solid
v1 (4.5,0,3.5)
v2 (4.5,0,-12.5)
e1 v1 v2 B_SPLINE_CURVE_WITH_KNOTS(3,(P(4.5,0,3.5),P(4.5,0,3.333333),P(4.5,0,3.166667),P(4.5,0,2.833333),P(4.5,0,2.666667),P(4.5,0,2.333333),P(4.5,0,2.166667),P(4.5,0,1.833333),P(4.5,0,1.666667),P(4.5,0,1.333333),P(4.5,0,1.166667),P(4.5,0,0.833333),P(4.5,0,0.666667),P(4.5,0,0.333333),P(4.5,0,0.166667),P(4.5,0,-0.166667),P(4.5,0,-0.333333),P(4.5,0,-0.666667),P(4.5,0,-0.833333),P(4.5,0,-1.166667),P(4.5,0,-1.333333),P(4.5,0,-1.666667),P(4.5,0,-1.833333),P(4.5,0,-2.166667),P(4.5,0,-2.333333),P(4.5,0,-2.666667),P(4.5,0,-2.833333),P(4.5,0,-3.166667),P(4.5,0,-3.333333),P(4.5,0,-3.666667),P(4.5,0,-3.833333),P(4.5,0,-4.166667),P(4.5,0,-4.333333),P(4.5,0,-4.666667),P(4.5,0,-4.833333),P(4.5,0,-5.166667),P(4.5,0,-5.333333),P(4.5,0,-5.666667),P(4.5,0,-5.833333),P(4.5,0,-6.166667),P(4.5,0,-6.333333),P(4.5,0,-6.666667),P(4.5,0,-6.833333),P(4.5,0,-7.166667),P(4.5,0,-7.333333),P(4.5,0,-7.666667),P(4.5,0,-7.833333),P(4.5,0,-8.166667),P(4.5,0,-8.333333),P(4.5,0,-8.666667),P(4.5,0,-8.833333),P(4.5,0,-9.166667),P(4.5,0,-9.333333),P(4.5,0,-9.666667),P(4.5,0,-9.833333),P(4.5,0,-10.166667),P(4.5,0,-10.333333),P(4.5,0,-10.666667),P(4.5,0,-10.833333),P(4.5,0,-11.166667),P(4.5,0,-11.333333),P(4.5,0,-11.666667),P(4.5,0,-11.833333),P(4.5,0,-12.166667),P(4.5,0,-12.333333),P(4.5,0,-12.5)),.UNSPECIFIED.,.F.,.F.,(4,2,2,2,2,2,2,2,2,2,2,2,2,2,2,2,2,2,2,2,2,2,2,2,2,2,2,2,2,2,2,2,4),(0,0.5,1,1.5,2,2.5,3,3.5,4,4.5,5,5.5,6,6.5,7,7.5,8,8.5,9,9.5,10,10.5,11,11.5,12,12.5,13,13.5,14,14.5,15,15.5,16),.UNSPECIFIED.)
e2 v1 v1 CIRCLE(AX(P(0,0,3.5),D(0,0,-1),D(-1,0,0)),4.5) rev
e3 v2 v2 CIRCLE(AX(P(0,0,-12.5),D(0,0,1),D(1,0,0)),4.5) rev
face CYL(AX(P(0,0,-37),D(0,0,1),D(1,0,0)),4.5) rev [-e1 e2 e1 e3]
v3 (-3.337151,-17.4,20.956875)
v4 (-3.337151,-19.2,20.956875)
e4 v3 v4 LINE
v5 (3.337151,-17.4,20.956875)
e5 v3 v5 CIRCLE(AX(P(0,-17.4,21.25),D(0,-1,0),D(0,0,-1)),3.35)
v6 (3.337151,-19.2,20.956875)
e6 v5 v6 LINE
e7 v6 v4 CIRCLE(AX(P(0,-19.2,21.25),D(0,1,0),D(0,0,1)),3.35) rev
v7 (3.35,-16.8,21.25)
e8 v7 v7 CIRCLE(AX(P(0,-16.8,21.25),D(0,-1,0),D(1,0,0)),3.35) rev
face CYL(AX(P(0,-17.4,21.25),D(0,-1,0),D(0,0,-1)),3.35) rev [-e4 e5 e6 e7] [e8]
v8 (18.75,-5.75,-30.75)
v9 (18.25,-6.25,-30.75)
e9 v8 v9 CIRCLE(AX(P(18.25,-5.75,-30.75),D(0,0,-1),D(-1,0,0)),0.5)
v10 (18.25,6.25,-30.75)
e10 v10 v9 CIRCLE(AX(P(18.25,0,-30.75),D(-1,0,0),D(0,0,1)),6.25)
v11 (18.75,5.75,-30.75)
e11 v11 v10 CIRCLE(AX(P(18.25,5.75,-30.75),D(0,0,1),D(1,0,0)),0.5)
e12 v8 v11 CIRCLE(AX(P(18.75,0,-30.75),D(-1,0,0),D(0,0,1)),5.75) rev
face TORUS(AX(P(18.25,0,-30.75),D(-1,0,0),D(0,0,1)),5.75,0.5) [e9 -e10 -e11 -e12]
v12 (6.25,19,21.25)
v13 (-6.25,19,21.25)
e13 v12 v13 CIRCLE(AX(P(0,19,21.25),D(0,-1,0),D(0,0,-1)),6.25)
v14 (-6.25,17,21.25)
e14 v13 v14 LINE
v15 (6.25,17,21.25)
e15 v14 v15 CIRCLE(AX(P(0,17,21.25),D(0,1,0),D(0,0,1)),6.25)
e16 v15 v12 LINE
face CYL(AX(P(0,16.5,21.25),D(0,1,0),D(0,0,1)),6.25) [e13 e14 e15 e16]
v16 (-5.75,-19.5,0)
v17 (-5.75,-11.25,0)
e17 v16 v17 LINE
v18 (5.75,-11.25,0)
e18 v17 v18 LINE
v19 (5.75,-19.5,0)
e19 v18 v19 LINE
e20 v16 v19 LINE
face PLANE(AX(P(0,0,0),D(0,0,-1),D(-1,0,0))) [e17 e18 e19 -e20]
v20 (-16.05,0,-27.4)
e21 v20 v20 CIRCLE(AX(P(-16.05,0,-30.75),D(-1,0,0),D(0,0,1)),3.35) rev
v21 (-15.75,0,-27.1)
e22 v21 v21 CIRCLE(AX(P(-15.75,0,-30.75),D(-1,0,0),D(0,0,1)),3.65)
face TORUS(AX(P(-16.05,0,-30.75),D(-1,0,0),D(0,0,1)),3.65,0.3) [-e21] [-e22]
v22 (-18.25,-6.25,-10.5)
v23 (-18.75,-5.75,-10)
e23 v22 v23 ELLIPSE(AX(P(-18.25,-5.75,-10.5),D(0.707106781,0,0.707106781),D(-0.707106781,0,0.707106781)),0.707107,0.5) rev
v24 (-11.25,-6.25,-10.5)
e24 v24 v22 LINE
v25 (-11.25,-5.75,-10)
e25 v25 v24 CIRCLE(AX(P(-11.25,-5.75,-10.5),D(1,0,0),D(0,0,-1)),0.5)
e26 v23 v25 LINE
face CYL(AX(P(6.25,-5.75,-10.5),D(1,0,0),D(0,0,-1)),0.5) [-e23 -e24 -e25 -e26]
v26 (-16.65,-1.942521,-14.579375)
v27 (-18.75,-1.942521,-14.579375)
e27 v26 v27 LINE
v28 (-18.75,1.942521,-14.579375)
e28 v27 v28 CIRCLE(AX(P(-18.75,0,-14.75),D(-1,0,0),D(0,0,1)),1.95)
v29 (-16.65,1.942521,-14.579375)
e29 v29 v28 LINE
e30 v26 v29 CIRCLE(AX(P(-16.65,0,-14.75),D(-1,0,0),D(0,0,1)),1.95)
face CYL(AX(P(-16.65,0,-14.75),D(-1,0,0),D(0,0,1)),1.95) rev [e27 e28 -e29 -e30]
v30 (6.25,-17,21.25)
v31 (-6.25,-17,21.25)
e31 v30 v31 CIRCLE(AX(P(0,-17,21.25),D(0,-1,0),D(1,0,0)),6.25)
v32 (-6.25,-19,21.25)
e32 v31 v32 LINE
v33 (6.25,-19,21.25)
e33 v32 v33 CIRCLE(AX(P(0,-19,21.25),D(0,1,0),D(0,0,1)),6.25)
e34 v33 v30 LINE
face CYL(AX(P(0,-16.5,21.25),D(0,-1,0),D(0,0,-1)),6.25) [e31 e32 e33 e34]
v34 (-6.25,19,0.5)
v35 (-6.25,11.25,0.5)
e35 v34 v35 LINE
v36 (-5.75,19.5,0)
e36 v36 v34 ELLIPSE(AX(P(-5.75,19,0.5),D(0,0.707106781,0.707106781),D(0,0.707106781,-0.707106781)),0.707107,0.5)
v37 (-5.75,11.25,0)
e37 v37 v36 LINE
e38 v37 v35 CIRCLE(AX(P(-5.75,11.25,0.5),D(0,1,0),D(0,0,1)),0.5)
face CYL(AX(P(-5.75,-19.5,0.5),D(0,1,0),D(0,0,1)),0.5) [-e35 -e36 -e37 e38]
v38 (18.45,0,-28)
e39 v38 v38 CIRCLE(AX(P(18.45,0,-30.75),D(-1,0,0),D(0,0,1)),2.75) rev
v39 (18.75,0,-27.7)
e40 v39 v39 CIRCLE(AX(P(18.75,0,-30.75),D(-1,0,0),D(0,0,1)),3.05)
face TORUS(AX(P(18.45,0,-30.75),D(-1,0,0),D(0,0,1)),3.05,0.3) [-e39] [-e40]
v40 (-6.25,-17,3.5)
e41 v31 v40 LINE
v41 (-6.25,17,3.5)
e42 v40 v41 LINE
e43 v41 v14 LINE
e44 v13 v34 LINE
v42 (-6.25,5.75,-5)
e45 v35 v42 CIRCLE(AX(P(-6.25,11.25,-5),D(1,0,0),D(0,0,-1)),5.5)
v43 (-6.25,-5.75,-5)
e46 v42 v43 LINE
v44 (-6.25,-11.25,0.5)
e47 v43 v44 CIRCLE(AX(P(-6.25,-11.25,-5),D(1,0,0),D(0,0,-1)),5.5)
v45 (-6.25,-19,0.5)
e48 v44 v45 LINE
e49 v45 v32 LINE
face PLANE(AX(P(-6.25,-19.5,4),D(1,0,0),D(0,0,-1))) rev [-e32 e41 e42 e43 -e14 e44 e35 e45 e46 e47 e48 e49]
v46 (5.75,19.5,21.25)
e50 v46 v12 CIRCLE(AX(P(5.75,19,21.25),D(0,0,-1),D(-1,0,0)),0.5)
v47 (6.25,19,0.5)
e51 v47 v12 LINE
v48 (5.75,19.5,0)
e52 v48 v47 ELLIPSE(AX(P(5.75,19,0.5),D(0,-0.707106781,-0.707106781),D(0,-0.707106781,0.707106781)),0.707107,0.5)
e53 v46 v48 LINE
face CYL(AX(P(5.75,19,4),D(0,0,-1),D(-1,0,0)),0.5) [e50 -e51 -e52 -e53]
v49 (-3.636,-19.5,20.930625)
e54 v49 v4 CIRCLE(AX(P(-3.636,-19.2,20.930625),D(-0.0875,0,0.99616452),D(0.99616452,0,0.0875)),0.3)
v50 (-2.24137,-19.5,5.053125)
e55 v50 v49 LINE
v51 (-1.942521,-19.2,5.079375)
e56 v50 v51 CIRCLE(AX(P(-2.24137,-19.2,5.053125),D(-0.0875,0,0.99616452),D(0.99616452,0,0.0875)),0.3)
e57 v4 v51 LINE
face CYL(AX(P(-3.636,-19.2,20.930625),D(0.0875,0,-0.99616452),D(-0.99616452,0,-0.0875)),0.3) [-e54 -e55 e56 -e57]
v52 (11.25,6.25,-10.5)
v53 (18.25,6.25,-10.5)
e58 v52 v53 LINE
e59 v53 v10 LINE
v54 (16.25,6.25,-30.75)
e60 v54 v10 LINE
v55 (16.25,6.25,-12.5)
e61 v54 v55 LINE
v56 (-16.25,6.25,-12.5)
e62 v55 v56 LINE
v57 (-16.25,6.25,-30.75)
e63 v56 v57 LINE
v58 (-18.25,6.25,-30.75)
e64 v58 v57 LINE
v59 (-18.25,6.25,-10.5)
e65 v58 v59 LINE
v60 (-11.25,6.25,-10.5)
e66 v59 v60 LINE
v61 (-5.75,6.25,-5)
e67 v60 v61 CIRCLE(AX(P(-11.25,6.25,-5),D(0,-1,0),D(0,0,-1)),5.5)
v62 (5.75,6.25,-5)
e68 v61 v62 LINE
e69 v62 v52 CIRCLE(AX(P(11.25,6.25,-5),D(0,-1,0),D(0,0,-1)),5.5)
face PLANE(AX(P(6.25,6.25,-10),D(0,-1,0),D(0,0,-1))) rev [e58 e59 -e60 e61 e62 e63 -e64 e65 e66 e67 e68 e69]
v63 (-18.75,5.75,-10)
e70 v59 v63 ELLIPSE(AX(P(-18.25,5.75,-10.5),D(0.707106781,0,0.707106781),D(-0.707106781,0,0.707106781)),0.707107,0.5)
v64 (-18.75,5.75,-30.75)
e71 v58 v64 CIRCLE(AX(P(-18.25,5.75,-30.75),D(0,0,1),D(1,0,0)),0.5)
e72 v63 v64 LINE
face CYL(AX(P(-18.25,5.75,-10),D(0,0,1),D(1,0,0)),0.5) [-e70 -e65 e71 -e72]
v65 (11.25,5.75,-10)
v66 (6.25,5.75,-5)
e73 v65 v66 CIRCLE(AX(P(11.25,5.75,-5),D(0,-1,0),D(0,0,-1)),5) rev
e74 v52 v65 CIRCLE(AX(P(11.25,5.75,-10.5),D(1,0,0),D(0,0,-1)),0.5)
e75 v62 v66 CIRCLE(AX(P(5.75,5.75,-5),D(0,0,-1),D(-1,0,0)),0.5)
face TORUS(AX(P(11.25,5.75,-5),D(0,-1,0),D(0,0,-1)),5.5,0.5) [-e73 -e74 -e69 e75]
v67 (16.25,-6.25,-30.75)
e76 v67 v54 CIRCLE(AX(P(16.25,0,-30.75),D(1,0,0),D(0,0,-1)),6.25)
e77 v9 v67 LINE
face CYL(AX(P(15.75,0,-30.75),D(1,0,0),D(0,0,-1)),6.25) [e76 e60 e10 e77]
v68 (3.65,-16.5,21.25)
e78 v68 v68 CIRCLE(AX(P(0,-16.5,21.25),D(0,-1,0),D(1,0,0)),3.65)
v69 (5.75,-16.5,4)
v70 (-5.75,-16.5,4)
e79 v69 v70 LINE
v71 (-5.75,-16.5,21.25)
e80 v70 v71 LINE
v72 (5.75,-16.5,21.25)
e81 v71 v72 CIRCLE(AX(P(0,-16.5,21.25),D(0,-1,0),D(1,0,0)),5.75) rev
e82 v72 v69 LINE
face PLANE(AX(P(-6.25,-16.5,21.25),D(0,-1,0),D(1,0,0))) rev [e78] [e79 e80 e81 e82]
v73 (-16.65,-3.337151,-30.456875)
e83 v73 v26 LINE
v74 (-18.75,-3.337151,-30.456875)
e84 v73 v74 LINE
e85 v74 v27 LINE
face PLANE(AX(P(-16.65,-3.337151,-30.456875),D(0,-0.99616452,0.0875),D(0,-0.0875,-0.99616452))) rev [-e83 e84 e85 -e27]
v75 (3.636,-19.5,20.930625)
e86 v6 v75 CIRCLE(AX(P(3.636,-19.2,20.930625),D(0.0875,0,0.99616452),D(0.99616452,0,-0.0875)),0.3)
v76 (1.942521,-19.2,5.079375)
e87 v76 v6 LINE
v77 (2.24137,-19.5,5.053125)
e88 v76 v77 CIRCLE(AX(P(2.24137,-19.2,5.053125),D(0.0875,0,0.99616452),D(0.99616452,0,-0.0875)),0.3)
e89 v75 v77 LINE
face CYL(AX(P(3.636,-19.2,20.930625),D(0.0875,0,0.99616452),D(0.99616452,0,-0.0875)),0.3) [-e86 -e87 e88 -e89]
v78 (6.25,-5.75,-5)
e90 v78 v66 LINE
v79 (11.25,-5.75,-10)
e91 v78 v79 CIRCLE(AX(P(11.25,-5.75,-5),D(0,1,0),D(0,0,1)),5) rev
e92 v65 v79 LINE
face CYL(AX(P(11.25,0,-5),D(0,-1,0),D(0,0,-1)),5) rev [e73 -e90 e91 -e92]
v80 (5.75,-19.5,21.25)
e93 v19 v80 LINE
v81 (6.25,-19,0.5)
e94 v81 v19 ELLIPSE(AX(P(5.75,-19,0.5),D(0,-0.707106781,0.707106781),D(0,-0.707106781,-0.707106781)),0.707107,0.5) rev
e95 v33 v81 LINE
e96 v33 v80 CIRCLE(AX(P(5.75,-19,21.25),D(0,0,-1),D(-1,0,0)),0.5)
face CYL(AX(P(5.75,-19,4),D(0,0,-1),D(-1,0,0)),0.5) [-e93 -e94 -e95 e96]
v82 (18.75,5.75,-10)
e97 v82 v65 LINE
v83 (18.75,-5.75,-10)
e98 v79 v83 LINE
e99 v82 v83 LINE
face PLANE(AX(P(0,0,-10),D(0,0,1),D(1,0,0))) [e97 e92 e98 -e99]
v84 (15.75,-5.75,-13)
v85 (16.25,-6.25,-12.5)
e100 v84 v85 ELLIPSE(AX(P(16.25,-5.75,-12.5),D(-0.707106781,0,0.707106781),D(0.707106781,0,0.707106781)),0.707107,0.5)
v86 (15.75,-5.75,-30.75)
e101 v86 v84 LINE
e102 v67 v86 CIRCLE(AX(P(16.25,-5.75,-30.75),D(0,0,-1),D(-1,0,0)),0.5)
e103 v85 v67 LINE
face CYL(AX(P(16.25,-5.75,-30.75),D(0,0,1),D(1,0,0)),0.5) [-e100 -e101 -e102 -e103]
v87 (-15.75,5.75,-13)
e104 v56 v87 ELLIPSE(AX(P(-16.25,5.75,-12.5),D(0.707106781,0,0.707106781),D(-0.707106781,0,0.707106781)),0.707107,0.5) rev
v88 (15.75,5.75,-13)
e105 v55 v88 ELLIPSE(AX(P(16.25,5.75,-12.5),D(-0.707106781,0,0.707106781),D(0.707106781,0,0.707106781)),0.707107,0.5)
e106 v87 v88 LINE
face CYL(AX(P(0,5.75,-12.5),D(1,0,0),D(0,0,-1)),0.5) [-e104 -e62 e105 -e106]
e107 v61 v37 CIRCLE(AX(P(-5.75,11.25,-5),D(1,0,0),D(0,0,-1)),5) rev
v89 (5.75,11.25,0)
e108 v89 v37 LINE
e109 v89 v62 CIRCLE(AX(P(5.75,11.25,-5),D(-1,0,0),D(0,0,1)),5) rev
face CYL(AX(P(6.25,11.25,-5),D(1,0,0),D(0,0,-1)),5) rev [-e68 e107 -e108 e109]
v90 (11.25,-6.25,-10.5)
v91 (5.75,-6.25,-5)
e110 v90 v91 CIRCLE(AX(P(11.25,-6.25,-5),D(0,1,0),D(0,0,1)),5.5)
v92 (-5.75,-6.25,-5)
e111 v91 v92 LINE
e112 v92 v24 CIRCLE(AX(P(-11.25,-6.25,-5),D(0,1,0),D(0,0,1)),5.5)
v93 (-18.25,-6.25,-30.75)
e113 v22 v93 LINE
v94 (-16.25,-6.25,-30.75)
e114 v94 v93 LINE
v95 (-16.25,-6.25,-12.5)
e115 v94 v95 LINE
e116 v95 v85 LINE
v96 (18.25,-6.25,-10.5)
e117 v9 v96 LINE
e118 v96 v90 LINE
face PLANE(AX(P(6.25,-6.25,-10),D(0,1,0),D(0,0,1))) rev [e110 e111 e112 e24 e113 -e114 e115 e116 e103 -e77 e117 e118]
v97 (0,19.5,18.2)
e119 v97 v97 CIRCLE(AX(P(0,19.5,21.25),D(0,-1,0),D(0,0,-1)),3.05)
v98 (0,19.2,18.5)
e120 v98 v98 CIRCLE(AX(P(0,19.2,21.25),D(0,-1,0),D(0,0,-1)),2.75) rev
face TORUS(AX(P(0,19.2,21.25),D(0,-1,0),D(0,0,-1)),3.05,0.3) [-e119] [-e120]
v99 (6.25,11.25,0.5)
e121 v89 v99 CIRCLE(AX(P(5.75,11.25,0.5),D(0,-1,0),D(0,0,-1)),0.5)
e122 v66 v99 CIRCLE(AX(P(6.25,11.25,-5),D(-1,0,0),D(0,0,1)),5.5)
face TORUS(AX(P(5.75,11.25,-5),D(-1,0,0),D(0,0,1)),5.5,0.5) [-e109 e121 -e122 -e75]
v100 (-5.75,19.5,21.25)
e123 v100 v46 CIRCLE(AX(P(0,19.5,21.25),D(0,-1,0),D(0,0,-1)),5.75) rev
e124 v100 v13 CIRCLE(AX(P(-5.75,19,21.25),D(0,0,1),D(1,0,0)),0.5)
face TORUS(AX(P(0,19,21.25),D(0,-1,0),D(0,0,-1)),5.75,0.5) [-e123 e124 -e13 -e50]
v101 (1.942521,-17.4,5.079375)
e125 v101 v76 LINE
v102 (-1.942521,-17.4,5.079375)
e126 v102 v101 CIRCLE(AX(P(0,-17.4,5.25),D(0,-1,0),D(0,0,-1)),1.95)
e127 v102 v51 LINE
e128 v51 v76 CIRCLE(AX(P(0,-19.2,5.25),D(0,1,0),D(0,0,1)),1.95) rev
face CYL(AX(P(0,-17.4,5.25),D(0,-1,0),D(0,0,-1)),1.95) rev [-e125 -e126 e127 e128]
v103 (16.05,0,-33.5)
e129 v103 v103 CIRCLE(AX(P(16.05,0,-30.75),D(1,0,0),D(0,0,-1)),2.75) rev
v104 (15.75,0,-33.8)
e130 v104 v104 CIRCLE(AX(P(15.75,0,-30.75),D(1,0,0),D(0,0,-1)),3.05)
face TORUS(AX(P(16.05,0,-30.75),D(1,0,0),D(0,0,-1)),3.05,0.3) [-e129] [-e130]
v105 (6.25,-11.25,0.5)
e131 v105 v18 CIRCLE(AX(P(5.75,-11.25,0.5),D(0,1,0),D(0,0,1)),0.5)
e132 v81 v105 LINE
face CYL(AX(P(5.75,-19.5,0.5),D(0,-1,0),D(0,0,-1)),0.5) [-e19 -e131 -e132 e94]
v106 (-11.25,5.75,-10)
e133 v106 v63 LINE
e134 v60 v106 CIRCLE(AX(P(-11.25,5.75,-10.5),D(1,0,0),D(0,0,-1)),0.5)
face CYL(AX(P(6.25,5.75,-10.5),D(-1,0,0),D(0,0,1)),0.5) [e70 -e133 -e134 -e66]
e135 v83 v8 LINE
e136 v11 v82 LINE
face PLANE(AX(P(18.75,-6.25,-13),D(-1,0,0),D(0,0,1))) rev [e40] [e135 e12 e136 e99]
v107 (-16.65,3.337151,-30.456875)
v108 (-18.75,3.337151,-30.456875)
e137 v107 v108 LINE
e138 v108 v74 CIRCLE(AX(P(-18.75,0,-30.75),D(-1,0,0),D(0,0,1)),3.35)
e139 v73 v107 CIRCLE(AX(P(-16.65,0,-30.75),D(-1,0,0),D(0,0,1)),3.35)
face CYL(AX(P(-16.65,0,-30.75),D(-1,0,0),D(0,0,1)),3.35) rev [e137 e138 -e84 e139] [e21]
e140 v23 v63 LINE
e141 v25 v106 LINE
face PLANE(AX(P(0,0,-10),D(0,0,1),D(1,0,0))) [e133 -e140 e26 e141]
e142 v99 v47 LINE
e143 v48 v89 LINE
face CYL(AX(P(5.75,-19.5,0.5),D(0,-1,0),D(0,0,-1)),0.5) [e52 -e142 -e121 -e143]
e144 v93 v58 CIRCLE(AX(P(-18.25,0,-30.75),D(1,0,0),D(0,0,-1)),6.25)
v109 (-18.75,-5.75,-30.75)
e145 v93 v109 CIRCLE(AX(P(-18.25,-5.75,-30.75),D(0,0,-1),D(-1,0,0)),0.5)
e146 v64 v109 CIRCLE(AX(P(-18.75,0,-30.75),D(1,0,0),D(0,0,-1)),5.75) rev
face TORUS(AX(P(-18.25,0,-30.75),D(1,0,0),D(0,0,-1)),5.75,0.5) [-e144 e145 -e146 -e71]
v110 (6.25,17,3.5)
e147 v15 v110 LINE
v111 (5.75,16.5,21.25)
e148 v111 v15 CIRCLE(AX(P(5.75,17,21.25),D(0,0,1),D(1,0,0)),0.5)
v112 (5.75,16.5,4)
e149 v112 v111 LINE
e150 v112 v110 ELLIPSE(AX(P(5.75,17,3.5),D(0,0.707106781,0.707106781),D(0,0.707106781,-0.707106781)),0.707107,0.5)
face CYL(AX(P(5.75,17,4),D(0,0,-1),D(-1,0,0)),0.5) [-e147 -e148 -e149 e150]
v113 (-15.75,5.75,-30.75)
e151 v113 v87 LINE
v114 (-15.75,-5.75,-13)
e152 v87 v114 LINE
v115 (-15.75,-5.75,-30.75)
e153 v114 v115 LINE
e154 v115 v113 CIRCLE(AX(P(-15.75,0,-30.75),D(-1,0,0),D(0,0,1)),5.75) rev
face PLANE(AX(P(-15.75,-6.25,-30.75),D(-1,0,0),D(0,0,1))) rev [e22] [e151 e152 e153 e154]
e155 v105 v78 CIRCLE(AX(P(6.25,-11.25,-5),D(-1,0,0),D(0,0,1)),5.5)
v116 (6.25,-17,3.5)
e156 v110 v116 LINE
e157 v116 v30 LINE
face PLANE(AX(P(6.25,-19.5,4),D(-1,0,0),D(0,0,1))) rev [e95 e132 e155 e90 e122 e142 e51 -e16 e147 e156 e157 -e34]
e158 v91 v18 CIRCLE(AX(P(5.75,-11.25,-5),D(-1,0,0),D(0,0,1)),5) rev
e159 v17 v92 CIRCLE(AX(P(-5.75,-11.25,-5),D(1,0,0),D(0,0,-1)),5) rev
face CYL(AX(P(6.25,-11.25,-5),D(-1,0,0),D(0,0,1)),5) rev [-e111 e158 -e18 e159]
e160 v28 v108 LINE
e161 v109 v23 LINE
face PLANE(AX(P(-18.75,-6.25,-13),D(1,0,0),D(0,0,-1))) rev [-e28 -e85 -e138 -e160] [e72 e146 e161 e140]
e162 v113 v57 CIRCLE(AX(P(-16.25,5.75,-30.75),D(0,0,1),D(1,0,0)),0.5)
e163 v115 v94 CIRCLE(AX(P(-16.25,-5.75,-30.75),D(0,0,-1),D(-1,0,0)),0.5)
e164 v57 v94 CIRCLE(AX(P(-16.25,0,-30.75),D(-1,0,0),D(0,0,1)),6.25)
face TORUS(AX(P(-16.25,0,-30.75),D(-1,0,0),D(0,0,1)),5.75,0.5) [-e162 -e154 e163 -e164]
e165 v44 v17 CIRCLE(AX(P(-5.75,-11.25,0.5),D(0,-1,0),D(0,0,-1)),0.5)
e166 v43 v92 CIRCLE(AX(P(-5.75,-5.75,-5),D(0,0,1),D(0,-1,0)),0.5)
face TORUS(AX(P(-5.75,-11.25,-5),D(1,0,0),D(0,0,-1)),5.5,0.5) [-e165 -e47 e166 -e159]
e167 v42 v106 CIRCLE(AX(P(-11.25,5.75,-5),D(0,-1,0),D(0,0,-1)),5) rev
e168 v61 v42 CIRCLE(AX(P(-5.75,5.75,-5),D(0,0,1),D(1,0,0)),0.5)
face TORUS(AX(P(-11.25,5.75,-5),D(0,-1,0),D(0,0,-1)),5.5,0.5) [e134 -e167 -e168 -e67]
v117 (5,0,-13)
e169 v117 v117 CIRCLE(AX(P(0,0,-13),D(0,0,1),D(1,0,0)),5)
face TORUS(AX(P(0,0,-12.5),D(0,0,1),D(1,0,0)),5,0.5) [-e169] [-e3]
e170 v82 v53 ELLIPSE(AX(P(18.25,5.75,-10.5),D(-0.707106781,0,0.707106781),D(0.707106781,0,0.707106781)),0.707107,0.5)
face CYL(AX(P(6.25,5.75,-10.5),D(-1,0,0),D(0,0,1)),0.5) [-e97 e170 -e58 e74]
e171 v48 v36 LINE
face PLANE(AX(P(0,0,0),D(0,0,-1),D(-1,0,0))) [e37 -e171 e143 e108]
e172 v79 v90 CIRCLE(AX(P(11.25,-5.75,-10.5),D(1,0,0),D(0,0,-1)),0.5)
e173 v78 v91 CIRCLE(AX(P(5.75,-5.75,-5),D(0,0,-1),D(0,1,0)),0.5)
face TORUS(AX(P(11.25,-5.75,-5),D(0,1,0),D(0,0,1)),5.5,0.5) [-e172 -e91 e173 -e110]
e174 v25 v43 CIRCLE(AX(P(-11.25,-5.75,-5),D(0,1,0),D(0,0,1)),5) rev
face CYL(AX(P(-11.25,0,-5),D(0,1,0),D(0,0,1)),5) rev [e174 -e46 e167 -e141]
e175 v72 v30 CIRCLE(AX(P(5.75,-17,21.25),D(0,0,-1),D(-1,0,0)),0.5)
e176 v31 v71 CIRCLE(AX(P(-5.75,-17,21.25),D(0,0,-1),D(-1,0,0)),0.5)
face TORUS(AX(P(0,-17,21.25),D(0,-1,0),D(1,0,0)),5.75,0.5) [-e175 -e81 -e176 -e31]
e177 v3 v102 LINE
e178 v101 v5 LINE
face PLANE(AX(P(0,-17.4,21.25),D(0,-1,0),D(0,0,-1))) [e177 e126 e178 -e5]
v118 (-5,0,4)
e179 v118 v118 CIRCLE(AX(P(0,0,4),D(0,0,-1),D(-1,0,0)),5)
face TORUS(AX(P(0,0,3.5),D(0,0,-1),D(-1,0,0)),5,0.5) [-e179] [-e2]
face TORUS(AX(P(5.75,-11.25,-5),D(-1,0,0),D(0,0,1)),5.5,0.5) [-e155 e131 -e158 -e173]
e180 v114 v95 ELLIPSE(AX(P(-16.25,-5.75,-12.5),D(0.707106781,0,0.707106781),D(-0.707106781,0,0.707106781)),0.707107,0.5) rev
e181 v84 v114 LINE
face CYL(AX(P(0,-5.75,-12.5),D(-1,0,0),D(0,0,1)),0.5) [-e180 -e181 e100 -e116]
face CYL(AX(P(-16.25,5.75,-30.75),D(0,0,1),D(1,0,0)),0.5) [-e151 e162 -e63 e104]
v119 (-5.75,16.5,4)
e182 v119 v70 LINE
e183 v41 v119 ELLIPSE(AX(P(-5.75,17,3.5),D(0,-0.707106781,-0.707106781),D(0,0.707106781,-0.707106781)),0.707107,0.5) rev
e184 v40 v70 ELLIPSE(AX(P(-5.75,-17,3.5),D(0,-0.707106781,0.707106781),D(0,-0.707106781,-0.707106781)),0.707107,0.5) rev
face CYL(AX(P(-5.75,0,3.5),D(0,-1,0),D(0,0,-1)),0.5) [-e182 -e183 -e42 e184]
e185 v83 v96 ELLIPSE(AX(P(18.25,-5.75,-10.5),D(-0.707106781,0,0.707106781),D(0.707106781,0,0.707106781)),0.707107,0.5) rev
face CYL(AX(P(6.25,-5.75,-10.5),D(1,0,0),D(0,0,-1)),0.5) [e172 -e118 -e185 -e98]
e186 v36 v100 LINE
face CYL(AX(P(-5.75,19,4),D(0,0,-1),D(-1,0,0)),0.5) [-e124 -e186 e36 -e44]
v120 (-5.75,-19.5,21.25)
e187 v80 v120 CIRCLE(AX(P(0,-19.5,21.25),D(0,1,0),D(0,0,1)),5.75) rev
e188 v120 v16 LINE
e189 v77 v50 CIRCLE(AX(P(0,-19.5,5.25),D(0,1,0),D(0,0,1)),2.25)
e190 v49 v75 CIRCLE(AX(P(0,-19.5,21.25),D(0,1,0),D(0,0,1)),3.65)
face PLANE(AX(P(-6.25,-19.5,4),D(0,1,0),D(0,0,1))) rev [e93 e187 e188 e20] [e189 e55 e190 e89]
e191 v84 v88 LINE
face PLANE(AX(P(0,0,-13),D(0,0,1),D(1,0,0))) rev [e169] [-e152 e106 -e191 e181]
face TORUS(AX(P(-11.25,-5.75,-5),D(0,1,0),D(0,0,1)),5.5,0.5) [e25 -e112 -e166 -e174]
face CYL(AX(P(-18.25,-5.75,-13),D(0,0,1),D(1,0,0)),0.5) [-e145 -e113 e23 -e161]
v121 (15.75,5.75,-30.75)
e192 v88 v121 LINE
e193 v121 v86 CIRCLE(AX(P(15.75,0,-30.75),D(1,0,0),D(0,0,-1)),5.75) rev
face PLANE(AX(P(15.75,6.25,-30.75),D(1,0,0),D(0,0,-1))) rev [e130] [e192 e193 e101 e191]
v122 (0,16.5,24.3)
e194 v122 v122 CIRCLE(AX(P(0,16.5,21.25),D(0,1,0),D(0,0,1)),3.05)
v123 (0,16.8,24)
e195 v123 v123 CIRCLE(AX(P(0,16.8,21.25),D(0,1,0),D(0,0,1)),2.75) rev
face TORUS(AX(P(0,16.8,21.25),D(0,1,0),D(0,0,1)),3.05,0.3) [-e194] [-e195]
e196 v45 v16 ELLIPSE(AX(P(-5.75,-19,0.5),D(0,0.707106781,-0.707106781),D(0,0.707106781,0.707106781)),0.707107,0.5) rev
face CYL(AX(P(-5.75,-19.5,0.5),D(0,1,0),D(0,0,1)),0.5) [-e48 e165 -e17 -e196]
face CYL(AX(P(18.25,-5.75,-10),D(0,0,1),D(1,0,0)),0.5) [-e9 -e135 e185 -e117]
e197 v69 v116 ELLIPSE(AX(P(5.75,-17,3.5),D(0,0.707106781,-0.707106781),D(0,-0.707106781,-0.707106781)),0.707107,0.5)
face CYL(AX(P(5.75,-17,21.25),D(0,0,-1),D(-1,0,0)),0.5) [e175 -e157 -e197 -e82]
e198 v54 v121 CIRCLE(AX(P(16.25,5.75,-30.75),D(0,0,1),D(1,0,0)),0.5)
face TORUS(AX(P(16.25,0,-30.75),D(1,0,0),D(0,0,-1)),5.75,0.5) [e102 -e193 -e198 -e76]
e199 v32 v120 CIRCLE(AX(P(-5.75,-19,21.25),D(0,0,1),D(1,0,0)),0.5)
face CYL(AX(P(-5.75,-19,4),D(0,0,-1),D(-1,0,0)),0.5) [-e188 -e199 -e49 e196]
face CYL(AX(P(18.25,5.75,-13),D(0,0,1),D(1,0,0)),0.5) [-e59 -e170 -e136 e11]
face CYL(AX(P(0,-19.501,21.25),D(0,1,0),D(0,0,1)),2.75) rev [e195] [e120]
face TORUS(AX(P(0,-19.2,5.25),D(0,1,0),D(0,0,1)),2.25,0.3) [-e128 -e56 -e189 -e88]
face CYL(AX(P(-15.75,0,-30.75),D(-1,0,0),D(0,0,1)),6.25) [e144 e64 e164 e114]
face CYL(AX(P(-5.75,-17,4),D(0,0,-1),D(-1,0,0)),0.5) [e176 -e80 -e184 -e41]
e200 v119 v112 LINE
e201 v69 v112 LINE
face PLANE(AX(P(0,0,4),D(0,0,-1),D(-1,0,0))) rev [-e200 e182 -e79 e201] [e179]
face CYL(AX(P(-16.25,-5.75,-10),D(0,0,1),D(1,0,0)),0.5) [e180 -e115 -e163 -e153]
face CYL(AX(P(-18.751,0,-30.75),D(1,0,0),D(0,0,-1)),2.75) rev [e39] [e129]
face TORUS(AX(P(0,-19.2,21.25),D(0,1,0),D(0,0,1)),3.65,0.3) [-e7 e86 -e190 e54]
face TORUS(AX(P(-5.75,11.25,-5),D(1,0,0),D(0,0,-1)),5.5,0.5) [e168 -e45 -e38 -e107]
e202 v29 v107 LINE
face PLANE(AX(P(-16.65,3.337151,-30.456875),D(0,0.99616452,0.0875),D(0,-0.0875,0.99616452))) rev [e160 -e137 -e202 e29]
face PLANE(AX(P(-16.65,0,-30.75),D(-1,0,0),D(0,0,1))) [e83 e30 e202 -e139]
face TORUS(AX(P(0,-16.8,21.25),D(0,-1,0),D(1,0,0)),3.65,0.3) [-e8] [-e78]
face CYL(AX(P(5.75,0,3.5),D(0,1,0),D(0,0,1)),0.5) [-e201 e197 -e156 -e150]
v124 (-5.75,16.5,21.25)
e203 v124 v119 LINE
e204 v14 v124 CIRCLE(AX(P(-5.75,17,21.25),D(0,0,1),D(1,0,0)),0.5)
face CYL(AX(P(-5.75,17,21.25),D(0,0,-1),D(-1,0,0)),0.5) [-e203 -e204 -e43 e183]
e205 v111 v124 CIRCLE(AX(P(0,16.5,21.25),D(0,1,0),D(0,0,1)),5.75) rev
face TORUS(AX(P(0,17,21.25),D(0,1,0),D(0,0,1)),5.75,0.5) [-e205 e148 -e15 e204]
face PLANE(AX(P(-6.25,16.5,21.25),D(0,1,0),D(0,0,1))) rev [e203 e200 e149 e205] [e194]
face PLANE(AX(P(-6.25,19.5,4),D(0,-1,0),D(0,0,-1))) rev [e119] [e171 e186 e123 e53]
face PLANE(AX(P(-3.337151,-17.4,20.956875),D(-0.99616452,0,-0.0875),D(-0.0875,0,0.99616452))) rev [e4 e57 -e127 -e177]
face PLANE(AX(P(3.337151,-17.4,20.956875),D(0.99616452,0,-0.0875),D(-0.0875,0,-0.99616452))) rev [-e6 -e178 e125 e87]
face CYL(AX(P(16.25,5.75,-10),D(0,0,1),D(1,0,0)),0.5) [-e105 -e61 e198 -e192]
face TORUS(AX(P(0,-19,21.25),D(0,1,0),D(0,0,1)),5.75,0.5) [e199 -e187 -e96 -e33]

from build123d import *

# Parameters (mm, degrees)
SKETCH_1_W           = 12.5
SKETCH_1_H           = 39
EXTRUDE_1_DEPTH      = 4
SKETCH_2_W           = 12.5
SKETCH_2_H           = 3
EXTRUDE_2_DEPTH      = 17.25
SKETCH_5_R           = 6.25
EXTRUDE_3_DEPTH      = 3
EXTRUDE_START        = -3
SKETCH_6_R           = 6.25
EXTRUDE_4_DEPTH      = 3
SKETCH_7_W           = 12.5
SKETCH_7_H           = 12.5
EXTRUDE_5_DEPTH      = 10
SKETCH_8_W           = 37.5
SKETCH_8_H           = 12.5
EXTRUDE_6_DEPTH      = 3
SKETCH_9_W           = 3
SKETCH_9_H           = 12.5
EXTRUDE_7_DEPTH      = 17.75
SKETCH_10_R          = 6.25
EXTRUDE_8_DEPTH      = 3
SKETCH_11_R          = 6.25
EXTRUDE_9_DEPTH      = 3
FILLET_1_R           = 5
CUT_EXTRUDE_4_DEPTH  = 2.1
CUT_EXTRUDE_5_REACH  = 56.794
SKETCH_16_R          = 3.35
CUT_EXTRUDE_6_REACH  = 58.174
SKETCH_17_R          = 2.75
FILLET_2_R           = 0.5
FILLET_3_R           = 0.5
CUT_EXTRUDE_7_DEPTH  = 2.1
CUT_EXTRUDE_8_REACH  = 57.517
SKETCH_19_R          = 3.35
CUT_EXTRUDE_9_REACH  = 58.935
SKETCH_20_R          = 2.75
FILLET_4_R           = 0.3
SKETCH_21_R          = 4.5
CUT_EXTRUDE_10_DEPTH = 50.120387908
FILLET_5_R           = 0.5
FILLET_6_R           = 0.3


with BuildPart() as part:
    # 草图1 → 凸台-拉伸1 (new body)
    with BuildSketch(Plane.XY):
        Rectangle(SKETCH_1_W, SKETCH_1_H)
    extrude(amount=EXTRUDE_1_DEPTH)

    # 草图2 → 凸台-拉伸2 (add)
    with BuildSketch(Plane.XY.offset(4)):
        with Locations((0, 18)):
            Rectangle(SKETCH_2_W, SKETCH_2_H)
        with Locations((0, -18)):
            Rectangle(SKETCH_2_W, SKETCH_2_H)
    extrude(amount=EXTRUDE_2_DEPTH)

    # 草图5 → 凸台-拉伸3 (add)
    with BuildSketch(Plane(origin=(0, 19.5, 0), x_dir=(1, 0, 0), z_dir=(0, 1, 0))):
        with Locations((0, -21.25)):
            Circle(SKETCH_5_R)
    extrude(amount=-EXTRUDE_3_DEPTH)

    # 草图6 → 凸台-拉伸4 (add)
    with BuildSketch(Plane.XZ.offset(19.5).offset(EXTRUDE_START)):
        with Locations((0, 21.25)):
            Circle(SKETCH_6_R)
    extrude(amount=EXTRUDE_4_DEPTH)

    # 草图7 → 凸台-拉伸5 (add)
    with BuildSketch(Plane(origin=(0, 0, 0), x_dir=(-1, 0, 0), z_dir=(0, 0, -1))):
        Rectangle(SKETCH_7_W, SKETCH_7_H)
    extrude(amount=EXTRUDE_5_DEPTH)

    # 草图8 → 凸台-拉伸6 (add)
    with BuildSketch(Plane(origin=(0, 0, -10), x_dir=(-1, 0, 0), z_dir=(0, 0, -1))):
        Rectangle(SKETCH_8_W, SKETCH_8_H)
    extrude(amount=EXTRUDE_6_DEPTH)

    # 草图9 → 凸台-拉伸7 (add)
    with BuildSketch(Plane(origin=(0, 0, -13), x_dir=(-1, 0, 0), z_dir=(0, 0, -1))):
        with Locations((-17.25, 0)):
            Rectangle(SKETCH_9_W, SKETCH_9_H)
        with Locations((17.25, 0)):
            Rectangle(SKETCH_9_W, SKETCH_9_H)
    extrude(amount=EXTRUDE_7_DEPTH)

    # 草图10 → 凸台-拉伸8 (add)
    with BuildSketch(Plane(origin=(18.75, 0, 0), x_dir=(0, 0, -1), z_dir=(1, 0, 0))):
        with Locations((30.75, 0)):
            Circle(SKETCH_10_R)
    extrude(amount=-EXTRUDE_8_DEPTH)

    # 草图11 → 凸台-拉伸9 (add)
    with BuildSketch(Plane.ZY.offset(18.75).offset(EXTRUDE_START)):
        with Locations((-30.75, 0)):
            Circle(SKETCH_11_R)
    extrude(amount=EXTRUDE_9_DEPTH)

    # 圆角1
    fillet_1_edges = [part.edges().sort_by_distance(p)[0] for p in [
        (0, -6.25, 0),
        (6.25, 0, -10),
        (0, 6.25, 0),
        (-6.25, 0, -10),
    ]]
    fillet(fillet_1_edges, radius=FILLET_1_R - 0.0001)  # a hair under: the kernel refuses the full size

    # 草图15 → 切除-拉伸4 (cut)
    with BuildSketch(Plane.ZY.offset(18.75)):
        with BuildLine():
            Line((-30.456875, 3.33715114), (-14.579375, 1.942520813))
            ThreePointArc((-14.579375, 1.942520813), (-12.8, 0), (-14.579375, -1.942520813))
            Line((-14.579375, -1.942520813), (-30.456875, -3.33715114))
            ThreePointArc((-30.456875, -3.33715114), (-34.1, 0), (-30.456875, 3.33715114))
        make_face()
    extrude(amount=-CUT_EXTRUDE_4_DEPTH, mode=Mode.SUBTRACT)

    # 草图16 → 切除-拉伸5 (cut, up to next)
    with BuildSketch(Plane.ZY.offset(16.65), mode=Mode.PRIVATE) as cut_extrude_5_sk1:
        with Locations((-30.75, 0)):
            Circle(SKETCH_16_R)
    cut_extrude_5_tool1 = extrude(cut_extrude_5_sk1.sketch, amount=-CUT_EXTRUDE_5_REACH, mode=Mode.PRIVATE) & part.part
    add(cut_extrude_5_tool1.solids().sort_by_distance((-16.65, 0, -30.75))[0], mode=Mode.SUBTRACT)

    # 草图17 → 切除-拉伸6 (cut, up to next)
    with BuildSketch(Plane(origin=(18.75, 0, 0), x_dir=(0, 0, -1), z_dir=(1, 0, 0)), mode=Mode.PRIVATE) as cut_extrude_6_sk1:
        with Locations((30.75, 0)):
            Circle(SKETCH_17_R)
    cut_extrude_6_tool1 = extrude(cut_extrude_6_sk1.sketch, amount=-CUT_EXTRUDE_6_REACH, mode=Mode.PRIVATE) & part.part
    add(cut_extrude_6_tool1.solids().sort_by_distance((18.75, 0, -30.75))[0], mode=Mode.SUBTRACT)

    # 圆角2
    fillet_2_edges = [part.edges().sort_by_distance(p)[0] for p in [
        (18.75, 0, -37),
        (-18.75, 0, -37),
        (-14.99995, -6.25, -10),
        (-6.25, -15.37495, 0),
        (14.99995, 6.25, -10),
        (6.25, 15.37495, 0),
        (-6.25, -7.714436805, -1.464436805),
        (6.25, -7.714436805, -1.464436805),
        (7.714436805, -6.25, -8.535563195),
        (7.714436805, 6.25, -8.535563195),
        (6.25, 7.714436805, -1.464436805),
        (-6.25, 7.714436805, -1.464436805),
        (-7.714436805, 6.25, -8.535563195),
        (-7.714436805, -6.25, -8.535563195),
        (-6.25, 0, 4),
        (-6.25, 16.5, 12.625),
        (6.25, 16.5, 12.625),
        (6.25, 0, 4),
        (-6.25, -16.5, 12.625),
        (6.25, -16.5, 12.625),
        (0, 16.5, 27.5),
        (0, 19.5, 27.5),
        (0, -16.5, 27.5),
        (0, -19.5, 27.5),
        (-6.25, 15.37495, 0),
        (6.25, -15.37495, 0),
        (-18.75, -6.25, -20.375),
        (-14.99995, 6.25, -10),
        (-18.75, 6.25, -20.375),
        (18.75, 6.25, -20.375),
        (14.99995, -6.25, -10),
        (18.75, -6.25, -20.375),
        (6.25, -19.5, 10.625),
        (-6.25, -19.5, 10.625),
        (-6.25, 19.5, 10.625),
        (6.25, 19.5, 10.625),
    ]]
    fillet(fillet_2_edges, radius=FILLET_2_R)

    # 圆角3
    fillet_3_edges = [part.edges().sort_by_distance(p)[0] for p in [
        (15.75, 0, -37),
        (-15.75, 0, -37),
        (0, -6.25, -13),
        (15.75, -6.25, -21.875),
        (15.75, 6.25, -21.875),
        (0, 6.25, -13),
        (-15.75, 6.25, -21.875),
        (-15.75, -6.25, -21.875),
    ]]
    fillet(fillet_3_edges, radius=FILLET_3_R)

    # 草图18 → 切除-拉伸7 (cut)
    with BuildSketch(Plane.XZ.offset(19.5)):
        with BuildLine():
            Line((-3.33715114, 20.956875), (-1.942520813, 5.079375))
            ThreePointArc((-1.942520813, 5.079375), (0, 3.3), (1.942520813, 5.079375))
            Line((1.942520813, 5.079375), (3.33715114, 20.956875))
            ThreePointArc((3.33715114, 20.956875), (0, 24.6), (-3.33715114, 20.956875))
        make_face()
    extrude(amount=-CUT_EXTRUDE_7_DEPTH, mode=Mode.SUBTRACT)

    # 草图19 → 切除-拉伸8 (cut, up to next)
    with BuildSketch(Plane.XZ.offset(17.4), mode=Mode.PRIVATE) as cut_extrude_8_sk1:
        with Locations(Location((0, 21.25, 0), (0, 0, 354.980199868))):
            Circle(SKETCH_19_R)
    cut_extrude_8_tool1 = extrude(cut_extrude_8_sk1.sketch, amount=-CUT_EXTRUDE_8_REACH, mode=Mode.PRIVATE) & part.part
    add(cut_extrude_8_tool1.solids().sort_by_distance((0, -17.4, 21.25))[0], mode=Mode.SUBTRACT)

    # 草图20 → 切除-拉伸9 (cut, up to next)
    with BuildSketch(Plane(origin=(0, 19.5, 0), x_dir=(1, 0, 0), z_dir=(0, 1, 0)), mode=Mode.PRIVATE) as cut_extrude_9_sk1:
        with Locations(Location((0, -21.25, 0), (0, 0, 270))):
            Circle(SKETCH_20_R)
    cut_extrude_9_tool1 = extrude(cut_extrude_9_sk1.sketch, amount=-CUT_EXTRUDE_9_REACH, mode=Mode.PRIVATE) & part.part
    add(cut_extrude_9_tool1.solids().sort_by_distance((0, 19.5, 21.25))[0], mode=Mode.SUBTRACT)

    # 圆角4
    fillet_4_edges = [part.edges().sort_by_distance(p)[0] for p in [
        (0, -19.5, 24.6),
        (-2.639835977, -19.5, 13.018125),
        (0, -19.5, 3.3),
        (2.639835977, -19.5, 13.018125),
        (-3.33715114, -16.5, 21.543125),
        (0, 19.5, 18.5),
        (0, 16.5, 18.5),
    ]]
    fillet(fillet_4_edges, radius=FILLET_4_R)

    # 草图21 → 切除-拉伸10 (cut, through all)
    with BuildSketch(Plane.XY.offset(4)):
        Circle(SKETCH_21_R)
    extrude(amount=-CUT_EXTRUDE_10_DEPTH, mode=Mode.SUBTRACT)

    # 圆角5
    fillet_5_edges = [part.edges().sort_by_distance(p)[0] for p in [
        (-4.5, 0, -13),
        (-4.5, 0, 4),
    ]]
    fillet(fillet_5_edges, radius=FILLET_5_R)

    # 圆角6
    fillet_6_edges = [part.edges().sort_by_distance(p)[0] for p in [
        (-15.75, 0, -34.1),
        (18.75, 0, -28),
        (15.75, 0, -28),
    ]]
    fillet(fillet_6_edges, radius=FILLET_6_R)


solid = part.part
